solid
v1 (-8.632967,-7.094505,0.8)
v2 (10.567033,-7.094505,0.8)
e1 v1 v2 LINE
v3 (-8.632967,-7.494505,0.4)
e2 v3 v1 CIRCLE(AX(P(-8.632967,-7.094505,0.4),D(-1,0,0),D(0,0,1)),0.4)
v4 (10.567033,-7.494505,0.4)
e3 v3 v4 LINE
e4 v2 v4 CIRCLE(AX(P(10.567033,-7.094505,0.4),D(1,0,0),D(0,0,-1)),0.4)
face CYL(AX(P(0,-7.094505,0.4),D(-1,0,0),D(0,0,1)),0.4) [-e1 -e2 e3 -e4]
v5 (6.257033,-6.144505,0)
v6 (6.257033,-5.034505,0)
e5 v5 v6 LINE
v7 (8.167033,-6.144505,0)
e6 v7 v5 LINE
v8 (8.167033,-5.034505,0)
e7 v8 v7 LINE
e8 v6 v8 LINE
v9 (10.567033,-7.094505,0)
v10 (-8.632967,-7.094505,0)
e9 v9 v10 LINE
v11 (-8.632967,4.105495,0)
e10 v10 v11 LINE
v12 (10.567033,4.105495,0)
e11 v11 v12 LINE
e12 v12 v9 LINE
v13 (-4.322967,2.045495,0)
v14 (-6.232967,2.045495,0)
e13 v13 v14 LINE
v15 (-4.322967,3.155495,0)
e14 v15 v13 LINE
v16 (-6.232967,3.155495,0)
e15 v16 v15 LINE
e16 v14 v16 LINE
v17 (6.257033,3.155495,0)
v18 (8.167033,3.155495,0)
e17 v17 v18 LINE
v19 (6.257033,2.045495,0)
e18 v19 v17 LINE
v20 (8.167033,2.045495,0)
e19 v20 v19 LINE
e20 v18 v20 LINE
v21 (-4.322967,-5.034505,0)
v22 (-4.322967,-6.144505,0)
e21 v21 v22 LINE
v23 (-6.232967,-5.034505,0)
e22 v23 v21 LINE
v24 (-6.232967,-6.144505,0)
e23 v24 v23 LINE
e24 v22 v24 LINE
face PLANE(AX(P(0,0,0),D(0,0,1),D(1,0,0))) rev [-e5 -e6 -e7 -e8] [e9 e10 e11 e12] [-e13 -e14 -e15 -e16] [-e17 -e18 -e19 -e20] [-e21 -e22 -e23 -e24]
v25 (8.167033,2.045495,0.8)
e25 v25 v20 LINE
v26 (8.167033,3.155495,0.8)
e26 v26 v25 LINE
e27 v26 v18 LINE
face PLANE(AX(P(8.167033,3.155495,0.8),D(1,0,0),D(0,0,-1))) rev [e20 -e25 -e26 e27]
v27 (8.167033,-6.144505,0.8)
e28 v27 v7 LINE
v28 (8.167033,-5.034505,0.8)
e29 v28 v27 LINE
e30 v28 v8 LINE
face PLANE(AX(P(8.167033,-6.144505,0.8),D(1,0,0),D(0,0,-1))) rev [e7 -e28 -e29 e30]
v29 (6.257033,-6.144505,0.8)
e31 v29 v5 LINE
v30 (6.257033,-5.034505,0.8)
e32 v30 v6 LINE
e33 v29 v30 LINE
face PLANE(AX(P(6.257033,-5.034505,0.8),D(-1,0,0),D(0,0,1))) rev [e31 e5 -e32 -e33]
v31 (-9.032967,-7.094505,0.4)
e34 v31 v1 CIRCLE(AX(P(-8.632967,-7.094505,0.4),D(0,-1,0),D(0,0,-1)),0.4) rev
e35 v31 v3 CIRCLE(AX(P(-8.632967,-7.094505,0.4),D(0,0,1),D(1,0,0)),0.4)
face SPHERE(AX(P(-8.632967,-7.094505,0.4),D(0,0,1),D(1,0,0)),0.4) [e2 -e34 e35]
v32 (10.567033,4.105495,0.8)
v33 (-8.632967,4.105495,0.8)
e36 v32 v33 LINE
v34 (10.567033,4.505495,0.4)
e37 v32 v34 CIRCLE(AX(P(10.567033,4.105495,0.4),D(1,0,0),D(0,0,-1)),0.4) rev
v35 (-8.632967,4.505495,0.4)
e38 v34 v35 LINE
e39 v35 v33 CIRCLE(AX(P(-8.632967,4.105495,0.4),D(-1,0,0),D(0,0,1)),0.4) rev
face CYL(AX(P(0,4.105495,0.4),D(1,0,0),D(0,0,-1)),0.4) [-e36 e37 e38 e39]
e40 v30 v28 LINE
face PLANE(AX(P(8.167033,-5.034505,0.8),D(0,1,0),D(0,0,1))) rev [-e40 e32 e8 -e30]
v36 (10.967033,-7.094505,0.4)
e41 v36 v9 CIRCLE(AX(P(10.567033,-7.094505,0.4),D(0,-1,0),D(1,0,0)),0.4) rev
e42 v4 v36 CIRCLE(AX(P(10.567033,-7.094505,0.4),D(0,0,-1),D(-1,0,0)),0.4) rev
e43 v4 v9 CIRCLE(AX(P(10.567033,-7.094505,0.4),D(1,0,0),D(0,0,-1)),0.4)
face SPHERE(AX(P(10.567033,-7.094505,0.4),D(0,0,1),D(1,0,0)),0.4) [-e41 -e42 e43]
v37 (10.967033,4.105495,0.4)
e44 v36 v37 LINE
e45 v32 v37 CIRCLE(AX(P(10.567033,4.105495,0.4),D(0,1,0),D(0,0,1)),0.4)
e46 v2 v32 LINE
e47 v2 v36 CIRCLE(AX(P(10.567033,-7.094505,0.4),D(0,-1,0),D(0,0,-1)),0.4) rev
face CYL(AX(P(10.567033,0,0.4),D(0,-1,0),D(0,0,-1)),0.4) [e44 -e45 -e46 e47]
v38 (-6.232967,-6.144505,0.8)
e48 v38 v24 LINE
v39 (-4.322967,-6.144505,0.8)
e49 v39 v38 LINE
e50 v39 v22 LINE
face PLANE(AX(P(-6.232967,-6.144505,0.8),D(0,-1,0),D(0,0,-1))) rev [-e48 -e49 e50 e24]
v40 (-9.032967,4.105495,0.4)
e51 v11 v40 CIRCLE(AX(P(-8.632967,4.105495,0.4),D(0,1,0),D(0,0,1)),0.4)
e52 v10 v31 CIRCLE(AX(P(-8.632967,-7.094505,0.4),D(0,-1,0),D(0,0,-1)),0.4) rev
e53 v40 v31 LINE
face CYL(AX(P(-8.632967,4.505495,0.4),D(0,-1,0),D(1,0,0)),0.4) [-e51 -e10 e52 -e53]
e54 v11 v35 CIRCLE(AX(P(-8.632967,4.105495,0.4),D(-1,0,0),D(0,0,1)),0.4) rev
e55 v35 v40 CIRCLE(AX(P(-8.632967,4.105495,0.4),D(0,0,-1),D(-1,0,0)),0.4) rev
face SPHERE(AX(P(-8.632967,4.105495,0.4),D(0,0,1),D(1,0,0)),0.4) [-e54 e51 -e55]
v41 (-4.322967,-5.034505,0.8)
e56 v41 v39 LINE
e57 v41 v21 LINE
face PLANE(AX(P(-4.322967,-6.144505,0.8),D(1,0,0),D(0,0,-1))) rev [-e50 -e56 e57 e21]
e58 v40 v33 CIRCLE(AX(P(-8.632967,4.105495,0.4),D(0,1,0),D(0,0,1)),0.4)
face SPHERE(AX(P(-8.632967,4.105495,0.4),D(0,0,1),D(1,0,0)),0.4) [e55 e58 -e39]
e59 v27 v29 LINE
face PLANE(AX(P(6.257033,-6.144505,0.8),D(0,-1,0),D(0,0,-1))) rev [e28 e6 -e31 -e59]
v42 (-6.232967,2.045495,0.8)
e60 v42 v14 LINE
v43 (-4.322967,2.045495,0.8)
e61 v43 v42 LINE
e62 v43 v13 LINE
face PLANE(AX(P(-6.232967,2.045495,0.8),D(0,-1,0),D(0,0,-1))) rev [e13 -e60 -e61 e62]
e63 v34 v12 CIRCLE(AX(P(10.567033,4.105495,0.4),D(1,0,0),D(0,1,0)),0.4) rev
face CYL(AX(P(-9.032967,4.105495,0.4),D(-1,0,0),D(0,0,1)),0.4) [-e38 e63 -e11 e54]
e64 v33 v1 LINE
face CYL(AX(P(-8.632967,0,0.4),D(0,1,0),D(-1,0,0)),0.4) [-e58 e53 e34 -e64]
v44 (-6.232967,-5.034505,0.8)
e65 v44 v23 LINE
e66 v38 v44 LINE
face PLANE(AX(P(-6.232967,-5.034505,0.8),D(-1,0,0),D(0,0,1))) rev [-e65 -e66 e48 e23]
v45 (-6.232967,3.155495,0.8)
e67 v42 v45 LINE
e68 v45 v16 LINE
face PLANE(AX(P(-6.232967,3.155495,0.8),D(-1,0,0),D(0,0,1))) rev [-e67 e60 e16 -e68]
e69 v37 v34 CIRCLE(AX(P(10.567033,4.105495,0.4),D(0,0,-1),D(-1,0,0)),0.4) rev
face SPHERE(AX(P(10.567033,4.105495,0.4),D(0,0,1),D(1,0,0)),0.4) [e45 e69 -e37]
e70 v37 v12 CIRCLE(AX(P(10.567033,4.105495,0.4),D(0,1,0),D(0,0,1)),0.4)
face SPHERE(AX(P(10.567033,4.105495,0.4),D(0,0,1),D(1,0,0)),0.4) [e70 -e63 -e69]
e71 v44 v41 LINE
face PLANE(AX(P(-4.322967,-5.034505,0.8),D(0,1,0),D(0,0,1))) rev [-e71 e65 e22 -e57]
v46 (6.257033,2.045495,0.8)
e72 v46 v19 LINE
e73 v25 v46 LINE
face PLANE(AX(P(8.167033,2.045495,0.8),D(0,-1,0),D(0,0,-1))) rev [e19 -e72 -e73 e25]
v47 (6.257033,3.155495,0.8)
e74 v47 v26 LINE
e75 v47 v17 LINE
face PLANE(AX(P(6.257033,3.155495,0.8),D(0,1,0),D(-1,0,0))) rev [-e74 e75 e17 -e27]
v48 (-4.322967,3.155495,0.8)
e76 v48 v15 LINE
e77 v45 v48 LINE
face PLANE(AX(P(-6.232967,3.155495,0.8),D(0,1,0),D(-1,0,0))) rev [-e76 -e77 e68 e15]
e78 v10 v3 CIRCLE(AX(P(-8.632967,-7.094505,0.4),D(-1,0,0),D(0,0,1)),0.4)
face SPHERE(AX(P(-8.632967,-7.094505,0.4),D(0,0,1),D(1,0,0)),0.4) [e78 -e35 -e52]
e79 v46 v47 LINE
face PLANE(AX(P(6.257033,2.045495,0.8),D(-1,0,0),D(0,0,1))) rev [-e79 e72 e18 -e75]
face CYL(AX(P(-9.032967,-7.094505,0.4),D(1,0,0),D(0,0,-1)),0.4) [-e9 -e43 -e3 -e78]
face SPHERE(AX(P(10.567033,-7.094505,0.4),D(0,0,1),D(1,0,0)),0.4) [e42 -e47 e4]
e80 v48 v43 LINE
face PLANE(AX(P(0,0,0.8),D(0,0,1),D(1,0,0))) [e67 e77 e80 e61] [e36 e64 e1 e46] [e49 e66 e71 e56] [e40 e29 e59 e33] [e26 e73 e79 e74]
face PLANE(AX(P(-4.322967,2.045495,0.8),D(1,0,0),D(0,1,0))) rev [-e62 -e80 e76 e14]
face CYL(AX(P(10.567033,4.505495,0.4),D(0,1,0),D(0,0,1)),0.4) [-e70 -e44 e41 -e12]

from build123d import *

# Parameters (mm, degrees)
SKETCH_1_W          = 20
SKETCH_1_H          = 12
EXTRUDE_1_DEPTH     = 0.8
FILLET_2_R          = 0.4
SKETCH_2_W          = 1.91
SKETCH_2_H          = 1.11
CUT_EXTRUDE_1_DEPTH = 14.307269619


with BuildPart() as part:
    # 草图1 → 凸台-拉伸1 (new body)
    with BuildSketch(Plane.XY):
        with Locations((0.967032967, -1.494505495)):
            Rectangle(SKETCH_1_W, SKETCH_1_H)
    extrude(amount=EXTRUDE_1_DEPTH)

    # 圆角2
    fillet_2_edges = [part.edges().sort_by_distance(p)[0] for p in [
        (10.967032967, -1.494505495, 0.8),
        (0.967032967, 4.505494505, 0.8),
        (-9.032967033, -1.494505495, 0.8),
        (0.967032967, 4.505494505, 0),
        (10.967032967, -1.494505495, 0),
        (0.967032967, -7.494505495, 0),
        (-9.032967033, -1.494505495, 0),
        (0.967032967, -7.494505495, 0.8),
        (-9.032967033, 4.505494505, 0.4),
        (10.967032967, 4.505494505, 0.4),
        (10.967032967, -7.494505495, 0.4),
        (-9.032967033, -7.494505495, 0.4),
    ]]
    fillet(fillet_2_edges, radius=FILLET_2_R - 0.0001)  # a hair under: the kernel refuses the full size

    # 草图2 → 切除-拉伸1 (cut, through all)
    with BuildSketch(Plane(origin=(0, 0, 0), x_dir=(-1, 0, 0), z_dir=(0, 0, -1))):
        with Locations((-7.212032967, 2.600494505)):
            Rectangle(SKETCH_2_W, SKETCH_2_H)
        with Locations((-7.212032967, -5.589505495)):
            Rectangle(SKETCH_2_W, SKETCH_2_H)
        with Locations((5.277967033, 2.600494505)):
            Rectangle(SKETCH_2_W, SKETCH_2_H)
        with Locations((5.277967033, -5.589505495)):
            Rectangle(SKETCH_2_W, SKETCH_2_H)
    extrude(amount=-CUT_EXTRUDE_1_DEPTH, mode=Mode.SUBTRACT)


solid = part.part
